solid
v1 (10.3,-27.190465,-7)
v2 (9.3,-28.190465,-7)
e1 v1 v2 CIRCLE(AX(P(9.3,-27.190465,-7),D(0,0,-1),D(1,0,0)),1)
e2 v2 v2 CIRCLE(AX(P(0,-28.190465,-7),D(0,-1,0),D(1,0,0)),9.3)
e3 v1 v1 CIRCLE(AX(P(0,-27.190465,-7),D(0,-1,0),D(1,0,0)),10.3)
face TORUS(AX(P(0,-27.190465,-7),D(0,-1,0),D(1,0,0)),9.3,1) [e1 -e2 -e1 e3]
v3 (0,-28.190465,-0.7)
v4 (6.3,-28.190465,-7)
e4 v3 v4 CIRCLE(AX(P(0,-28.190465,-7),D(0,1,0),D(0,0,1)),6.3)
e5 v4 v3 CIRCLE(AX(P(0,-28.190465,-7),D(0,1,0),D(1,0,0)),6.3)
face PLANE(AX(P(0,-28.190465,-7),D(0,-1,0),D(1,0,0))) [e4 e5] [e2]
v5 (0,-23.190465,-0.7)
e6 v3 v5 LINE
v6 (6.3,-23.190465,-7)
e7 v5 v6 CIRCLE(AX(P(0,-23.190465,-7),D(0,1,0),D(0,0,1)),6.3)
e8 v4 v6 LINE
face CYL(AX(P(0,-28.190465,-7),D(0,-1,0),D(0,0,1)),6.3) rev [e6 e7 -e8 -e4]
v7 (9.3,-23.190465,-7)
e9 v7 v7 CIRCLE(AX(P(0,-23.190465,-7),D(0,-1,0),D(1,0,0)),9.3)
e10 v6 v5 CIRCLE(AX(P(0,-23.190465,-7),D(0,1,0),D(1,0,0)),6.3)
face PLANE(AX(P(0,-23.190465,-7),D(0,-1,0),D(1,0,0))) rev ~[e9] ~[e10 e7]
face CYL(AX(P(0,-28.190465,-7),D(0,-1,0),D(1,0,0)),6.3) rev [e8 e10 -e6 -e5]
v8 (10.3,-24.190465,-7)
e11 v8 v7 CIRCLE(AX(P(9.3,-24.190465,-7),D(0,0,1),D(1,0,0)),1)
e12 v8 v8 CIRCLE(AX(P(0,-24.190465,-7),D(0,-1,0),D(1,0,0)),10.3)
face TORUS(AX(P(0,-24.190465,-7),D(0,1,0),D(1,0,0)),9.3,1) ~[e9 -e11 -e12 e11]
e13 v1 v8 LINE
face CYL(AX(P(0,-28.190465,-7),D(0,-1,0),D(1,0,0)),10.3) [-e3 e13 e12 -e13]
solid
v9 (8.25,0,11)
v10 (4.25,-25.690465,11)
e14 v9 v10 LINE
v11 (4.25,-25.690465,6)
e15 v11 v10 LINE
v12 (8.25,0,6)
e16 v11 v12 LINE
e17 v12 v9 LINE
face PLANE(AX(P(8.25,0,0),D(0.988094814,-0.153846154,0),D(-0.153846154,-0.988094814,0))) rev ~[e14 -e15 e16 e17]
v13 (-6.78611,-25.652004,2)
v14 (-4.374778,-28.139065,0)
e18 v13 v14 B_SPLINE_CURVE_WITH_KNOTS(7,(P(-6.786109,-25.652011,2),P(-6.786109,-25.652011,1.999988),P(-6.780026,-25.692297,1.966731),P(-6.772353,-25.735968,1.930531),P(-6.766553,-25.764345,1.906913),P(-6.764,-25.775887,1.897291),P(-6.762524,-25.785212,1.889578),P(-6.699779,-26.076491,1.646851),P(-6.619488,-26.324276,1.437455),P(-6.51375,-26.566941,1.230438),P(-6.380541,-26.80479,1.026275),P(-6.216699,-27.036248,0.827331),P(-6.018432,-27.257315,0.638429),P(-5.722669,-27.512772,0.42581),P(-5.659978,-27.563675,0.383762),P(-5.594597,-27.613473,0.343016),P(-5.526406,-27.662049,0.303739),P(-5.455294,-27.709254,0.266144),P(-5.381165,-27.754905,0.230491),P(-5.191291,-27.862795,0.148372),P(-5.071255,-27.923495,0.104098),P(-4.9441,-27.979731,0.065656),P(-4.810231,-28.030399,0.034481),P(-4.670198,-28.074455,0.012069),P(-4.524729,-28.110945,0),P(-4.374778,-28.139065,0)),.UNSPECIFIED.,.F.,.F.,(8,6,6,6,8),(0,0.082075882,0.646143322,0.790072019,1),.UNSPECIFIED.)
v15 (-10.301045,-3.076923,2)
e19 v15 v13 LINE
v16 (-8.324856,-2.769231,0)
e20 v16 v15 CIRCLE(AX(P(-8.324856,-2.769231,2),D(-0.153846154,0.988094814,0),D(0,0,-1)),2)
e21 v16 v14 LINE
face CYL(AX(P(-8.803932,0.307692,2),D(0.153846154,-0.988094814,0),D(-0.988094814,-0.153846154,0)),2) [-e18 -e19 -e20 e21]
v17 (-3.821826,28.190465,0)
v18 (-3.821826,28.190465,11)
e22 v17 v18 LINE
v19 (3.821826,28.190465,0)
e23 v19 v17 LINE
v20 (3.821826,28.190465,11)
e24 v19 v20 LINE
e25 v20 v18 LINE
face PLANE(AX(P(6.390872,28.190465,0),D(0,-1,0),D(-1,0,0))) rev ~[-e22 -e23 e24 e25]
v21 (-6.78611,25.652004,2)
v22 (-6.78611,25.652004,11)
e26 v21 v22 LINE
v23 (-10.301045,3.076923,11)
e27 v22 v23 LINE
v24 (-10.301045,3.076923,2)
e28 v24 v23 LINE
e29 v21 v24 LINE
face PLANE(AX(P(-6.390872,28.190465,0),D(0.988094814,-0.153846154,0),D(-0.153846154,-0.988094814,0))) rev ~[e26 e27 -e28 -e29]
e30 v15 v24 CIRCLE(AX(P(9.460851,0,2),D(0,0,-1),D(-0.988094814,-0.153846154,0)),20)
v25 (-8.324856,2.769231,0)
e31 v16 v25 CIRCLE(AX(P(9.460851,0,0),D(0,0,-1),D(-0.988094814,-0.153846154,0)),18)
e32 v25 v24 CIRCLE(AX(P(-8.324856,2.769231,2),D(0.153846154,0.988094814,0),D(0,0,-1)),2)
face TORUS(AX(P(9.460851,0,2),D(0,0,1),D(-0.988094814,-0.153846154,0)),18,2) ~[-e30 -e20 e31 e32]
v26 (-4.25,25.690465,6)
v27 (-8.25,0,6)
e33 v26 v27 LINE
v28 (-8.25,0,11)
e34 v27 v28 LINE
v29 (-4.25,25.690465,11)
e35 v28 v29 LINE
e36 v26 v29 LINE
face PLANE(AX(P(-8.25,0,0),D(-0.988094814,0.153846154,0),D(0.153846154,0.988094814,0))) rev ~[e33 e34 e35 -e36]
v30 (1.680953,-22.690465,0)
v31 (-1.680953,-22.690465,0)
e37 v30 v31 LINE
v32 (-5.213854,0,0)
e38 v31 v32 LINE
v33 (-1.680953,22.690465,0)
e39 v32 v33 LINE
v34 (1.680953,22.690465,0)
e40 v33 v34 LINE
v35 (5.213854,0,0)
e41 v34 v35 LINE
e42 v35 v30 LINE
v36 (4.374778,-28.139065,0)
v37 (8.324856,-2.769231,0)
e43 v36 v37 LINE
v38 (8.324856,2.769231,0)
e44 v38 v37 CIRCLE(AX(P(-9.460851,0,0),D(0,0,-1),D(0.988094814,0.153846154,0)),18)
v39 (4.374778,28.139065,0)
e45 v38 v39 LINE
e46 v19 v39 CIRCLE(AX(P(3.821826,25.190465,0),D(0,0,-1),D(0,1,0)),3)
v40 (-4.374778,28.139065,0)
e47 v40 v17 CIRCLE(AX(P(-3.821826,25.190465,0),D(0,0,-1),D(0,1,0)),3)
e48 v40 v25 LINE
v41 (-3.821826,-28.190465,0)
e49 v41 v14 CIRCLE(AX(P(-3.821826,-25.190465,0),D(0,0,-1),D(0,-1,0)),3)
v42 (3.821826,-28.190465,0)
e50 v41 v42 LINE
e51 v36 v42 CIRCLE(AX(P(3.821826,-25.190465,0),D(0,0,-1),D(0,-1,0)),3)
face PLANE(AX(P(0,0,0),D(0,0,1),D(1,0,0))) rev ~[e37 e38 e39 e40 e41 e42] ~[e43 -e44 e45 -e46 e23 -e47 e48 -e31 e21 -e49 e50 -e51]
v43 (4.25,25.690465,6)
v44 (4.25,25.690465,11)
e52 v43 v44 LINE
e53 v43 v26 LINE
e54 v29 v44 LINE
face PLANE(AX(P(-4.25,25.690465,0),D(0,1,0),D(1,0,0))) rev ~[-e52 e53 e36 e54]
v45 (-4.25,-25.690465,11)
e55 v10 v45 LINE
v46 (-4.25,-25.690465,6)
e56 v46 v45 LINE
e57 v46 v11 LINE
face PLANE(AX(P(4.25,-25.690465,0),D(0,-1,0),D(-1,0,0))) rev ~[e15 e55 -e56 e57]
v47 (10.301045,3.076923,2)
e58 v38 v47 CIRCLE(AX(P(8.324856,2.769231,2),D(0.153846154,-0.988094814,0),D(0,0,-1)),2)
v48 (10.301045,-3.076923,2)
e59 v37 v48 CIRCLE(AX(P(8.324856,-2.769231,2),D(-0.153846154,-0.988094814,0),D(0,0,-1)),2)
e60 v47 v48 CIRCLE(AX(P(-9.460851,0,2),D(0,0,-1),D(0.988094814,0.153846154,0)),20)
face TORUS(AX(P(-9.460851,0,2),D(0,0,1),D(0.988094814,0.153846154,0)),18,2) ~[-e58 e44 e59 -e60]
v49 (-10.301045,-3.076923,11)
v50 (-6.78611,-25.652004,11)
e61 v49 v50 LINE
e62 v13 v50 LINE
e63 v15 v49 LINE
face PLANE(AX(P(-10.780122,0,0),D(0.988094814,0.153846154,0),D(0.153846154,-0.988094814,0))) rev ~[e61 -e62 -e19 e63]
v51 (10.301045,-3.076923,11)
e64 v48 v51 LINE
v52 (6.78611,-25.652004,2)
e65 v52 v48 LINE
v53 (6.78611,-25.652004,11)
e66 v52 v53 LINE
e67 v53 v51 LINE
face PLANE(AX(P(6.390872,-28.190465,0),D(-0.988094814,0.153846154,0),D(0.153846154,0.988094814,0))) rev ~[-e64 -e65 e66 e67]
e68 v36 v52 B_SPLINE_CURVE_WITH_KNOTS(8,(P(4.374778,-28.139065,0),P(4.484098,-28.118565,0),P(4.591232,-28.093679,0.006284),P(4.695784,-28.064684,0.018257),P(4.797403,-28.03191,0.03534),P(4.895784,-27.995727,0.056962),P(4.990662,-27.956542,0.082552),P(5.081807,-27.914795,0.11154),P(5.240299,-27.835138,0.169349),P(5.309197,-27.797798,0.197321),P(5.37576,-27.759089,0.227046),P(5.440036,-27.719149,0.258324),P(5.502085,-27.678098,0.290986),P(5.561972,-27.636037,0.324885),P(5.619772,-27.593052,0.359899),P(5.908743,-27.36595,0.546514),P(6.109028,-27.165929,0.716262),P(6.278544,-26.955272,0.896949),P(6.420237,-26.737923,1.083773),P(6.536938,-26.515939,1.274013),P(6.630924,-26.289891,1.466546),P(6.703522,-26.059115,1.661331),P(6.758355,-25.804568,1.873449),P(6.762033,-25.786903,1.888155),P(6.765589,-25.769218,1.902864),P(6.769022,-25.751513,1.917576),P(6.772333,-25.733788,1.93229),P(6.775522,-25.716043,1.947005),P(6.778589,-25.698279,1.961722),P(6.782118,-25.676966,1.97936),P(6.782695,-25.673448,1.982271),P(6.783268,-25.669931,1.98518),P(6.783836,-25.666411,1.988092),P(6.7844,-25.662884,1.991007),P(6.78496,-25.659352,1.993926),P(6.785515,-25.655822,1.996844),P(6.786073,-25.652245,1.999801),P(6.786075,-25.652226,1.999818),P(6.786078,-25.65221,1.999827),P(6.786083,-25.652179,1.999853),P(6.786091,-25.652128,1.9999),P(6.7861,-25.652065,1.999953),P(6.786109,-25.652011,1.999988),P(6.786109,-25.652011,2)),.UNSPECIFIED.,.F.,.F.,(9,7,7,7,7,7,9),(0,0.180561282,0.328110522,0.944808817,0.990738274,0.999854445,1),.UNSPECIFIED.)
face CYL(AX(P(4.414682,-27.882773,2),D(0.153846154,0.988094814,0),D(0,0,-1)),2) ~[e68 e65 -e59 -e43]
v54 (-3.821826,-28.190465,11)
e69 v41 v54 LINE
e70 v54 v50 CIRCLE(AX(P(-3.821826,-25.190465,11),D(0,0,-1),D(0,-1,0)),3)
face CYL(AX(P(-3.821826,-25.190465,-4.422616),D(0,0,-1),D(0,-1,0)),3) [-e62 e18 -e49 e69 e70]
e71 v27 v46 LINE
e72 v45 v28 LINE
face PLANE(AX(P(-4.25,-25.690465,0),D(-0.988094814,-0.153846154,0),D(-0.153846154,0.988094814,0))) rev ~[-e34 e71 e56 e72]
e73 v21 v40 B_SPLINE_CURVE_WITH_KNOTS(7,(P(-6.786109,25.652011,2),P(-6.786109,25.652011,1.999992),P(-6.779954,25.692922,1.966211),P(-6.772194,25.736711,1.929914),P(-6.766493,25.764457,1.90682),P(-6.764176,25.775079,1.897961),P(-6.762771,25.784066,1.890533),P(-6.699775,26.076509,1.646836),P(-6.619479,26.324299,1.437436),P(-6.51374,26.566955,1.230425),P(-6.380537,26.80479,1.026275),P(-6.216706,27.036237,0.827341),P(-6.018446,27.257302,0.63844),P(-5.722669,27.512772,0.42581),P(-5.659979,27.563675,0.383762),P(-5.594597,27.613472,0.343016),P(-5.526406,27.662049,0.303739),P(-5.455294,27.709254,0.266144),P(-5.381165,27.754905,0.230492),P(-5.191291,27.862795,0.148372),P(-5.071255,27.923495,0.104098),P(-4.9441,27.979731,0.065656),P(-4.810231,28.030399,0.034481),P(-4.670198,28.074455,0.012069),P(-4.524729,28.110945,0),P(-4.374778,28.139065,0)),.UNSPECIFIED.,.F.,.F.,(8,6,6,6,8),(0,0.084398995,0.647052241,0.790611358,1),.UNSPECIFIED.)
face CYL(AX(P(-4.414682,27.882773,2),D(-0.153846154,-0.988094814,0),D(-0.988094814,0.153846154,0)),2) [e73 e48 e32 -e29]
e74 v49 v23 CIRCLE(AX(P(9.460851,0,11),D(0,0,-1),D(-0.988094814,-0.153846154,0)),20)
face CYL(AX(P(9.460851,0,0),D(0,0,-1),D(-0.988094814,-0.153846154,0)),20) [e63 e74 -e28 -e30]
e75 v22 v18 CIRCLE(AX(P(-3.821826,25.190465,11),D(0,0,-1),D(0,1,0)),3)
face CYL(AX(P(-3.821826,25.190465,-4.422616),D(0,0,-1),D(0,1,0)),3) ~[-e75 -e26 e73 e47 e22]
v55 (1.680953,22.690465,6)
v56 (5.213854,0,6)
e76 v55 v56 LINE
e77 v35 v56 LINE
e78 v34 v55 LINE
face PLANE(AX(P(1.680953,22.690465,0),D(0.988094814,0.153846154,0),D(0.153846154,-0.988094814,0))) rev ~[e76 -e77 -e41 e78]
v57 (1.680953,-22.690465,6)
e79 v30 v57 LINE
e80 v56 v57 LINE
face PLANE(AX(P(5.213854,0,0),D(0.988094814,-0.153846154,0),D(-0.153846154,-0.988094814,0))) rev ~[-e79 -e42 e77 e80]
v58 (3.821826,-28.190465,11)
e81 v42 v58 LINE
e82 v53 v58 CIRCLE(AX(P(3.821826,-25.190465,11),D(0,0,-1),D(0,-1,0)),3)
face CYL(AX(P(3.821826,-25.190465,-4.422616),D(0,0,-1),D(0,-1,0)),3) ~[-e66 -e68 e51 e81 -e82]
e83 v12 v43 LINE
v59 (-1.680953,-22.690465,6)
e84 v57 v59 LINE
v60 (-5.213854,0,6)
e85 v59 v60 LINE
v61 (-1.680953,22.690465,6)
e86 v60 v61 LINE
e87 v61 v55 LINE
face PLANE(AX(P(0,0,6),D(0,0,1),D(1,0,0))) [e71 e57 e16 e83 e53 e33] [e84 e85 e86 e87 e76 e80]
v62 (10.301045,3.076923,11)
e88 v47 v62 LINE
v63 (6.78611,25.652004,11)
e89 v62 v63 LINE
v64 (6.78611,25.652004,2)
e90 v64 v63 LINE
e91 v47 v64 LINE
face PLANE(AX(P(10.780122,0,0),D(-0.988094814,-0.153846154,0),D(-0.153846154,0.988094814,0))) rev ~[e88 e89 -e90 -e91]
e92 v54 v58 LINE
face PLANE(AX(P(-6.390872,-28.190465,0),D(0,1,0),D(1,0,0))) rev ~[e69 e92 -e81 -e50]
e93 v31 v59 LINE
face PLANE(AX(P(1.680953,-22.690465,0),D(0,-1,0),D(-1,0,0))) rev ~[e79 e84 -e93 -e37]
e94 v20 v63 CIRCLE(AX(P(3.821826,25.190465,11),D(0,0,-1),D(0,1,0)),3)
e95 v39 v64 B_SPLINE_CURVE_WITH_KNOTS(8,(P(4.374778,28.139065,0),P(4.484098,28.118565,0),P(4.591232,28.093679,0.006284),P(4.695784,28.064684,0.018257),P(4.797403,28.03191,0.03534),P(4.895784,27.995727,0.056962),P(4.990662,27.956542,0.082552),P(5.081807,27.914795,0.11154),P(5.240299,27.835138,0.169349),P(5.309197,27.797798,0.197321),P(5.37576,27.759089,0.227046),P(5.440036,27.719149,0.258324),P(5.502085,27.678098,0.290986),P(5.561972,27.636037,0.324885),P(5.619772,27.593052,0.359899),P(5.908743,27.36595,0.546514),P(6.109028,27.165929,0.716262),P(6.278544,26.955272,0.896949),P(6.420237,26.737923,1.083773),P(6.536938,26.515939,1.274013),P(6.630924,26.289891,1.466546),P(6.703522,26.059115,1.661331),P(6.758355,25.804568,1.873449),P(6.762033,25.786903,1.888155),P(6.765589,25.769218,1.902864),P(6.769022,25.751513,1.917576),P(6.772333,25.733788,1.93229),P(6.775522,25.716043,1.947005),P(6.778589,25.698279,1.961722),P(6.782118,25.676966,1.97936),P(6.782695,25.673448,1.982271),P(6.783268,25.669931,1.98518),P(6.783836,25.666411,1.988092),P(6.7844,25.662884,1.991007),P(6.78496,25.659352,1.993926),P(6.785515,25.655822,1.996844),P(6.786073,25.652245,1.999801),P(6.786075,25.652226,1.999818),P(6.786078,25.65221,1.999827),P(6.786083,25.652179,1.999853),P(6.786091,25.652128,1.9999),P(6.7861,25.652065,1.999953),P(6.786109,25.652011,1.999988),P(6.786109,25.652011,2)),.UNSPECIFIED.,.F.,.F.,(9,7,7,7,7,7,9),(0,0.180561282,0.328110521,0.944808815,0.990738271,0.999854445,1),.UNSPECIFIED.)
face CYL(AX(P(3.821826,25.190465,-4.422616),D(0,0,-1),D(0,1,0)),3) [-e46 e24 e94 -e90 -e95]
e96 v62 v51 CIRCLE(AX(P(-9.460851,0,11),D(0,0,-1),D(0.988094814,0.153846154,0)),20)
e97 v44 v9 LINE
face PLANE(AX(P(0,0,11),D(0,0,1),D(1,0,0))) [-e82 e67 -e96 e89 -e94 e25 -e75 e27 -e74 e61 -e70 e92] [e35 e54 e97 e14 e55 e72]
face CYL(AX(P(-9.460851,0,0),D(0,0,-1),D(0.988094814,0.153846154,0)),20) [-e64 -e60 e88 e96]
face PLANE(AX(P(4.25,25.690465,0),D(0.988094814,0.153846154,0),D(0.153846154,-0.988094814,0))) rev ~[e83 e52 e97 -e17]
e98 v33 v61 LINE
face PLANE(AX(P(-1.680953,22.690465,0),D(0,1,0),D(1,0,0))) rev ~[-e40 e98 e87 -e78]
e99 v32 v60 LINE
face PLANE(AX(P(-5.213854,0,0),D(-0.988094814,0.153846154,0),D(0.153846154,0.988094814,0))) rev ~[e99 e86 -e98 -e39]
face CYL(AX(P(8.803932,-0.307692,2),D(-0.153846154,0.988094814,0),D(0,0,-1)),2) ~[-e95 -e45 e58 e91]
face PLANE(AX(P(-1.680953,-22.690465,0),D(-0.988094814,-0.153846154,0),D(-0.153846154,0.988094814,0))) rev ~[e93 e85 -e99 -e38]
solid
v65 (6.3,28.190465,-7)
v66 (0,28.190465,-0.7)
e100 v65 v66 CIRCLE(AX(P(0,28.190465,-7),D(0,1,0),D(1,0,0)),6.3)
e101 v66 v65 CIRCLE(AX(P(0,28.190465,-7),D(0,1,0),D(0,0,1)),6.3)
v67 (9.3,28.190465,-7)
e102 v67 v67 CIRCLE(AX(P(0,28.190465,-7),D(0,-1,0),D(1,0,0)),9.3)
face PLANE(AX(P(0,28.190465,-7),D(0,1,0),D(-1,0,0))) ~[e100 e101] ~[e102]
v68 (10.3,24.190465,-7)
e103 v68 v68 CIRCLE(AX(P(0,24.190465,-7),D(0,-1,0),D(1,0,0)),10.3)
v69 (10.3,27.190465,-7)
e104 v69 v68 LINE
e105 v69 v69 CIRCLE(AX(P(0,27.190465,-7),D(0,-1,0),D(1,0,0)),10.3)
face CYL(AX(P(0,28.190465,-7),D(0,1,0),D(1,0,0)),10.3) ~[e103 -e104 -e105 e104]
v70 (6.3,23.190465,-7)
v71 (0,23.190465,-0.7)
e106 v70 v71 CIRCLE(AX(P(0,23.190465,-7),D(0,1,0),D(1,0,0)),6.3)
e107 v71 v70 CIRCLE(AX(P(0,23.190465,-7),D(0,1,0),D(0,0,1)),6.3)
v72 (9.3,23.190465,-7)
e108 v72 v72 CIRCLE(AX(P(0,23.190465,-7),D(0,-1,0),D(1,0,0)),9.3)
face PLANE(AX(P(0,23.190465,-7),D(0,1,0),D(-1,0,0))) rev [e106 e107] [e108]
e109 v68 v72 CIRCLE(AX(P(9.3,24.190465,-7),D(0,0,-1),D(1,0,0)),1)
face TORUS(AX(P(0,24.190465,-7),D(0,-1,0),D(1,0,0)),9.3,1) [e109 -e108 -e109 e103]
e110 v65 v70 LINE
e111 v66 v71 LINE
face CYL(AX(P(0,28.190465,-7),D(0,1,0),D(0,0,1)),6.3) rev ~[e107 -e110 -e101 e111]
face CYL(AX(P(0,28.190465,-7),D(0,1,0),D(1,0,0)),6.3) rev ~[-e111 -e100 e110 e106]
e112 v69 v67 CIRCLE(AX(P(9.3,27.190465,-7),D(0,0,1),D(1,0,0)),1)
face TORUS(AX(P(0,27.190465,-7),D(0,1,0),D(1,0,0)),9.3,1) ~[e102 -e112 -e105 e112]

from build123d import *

# Parameters (mm, degrees)
F1_DEPTH     = 6
F2_DEPTH     = 11
F3_R         = 10.3
F4_DEPTH     = 5
F8_R         = 2
F9_R         = 1
F9_2_R       = 1
F10_T1_DEPTH = 21.8452325787
F11_T1_DEPTH = 18.7849894416
F11_T4_ANGLE = 17.6997661969
F11_T6_ANGLE = 17.6997661969


# Not quite as in the source:
# - a fillet or chamfer that OpenCascade refuses, or shapes differently, is made with other operations: its cross-section is extruded or revolved along the edge and cut away or added


with BuildPart() as f1:
    # F0 (on Top) → F1 (new body)
    with BuildSketch(Plane.XY):
        Polygon((4.25, -25.6904651573), (8.25, 0), (4.25, 25.6904651573), (0, 25.6904651573), (-4.25, 25.6904651573), (-8.25, 0), (-4.25, -25.6904651573), (0, -25.6904651573), align=None)
        Polygon((0, 22.6904651573), (1.6809534843, 22.6904651573), (5.2138541178, 0), (1.6809534843, -22.6904651573), (0, -22.6904651573), (-1.6809534843, -22.6904651573), (-5.2138541178, 0), (-1.6809534843, 22.6904651573), align=None, mode=Mode.SUBTRACT)
    extrude(amount=F1_DEPTH)

    # F0 (on Top) → F2 (join)
    with BuildSketch(Plane.XY):
        Polygon((-6.3908720964, 28.1904651573), (-10.7801215685, 0), (-6.3908720964, -28.1904651573), (0, -28.1904651573), (6.3908720964, -28.1904651573), (10.7801215685, 0), (6.3908720964, 28.1904651573), (0, 28.1904651573), align=None)
        Polygon((4.25, 25.6904651573), (8.25, 0), (4.25, -25.6904651573), (0, -25.6904651573), (-4.25, -25.6904651573), (-8.25, 0), (-4.25, 25.6904651573), (0, 25.6904651573), align=None, mode=Mode.SUBTRACT)
    extrude(amount=F2_DEPTH)

    # F8
    f8_edges = [f1.edges().sort_by_distance(p)[0] for p in [
        (-8.585497, -14.095233, 0),
        (-8.585497, 14.095233, 0),
        (8.585497, 14.095233, 0),
        (8.585497, -14.095233, 0),
    ]]
    fillet(f8_edges, radius=F8_R)

    # F10: fillet of radius 3 on 4 edges, made by hand

    # F10_s2 → F10_t1 (cut)
    with BuildSketch(Plane.XY.offset(-4.4226162893)):
        with BuildLine():
            ThreePointArc((-3.8218255807, -28.1904651573), (-5.7731564875, -27.4691287333), (-6.7861100219, -25.6520036189))
            Line((-6.7861100219, -25.6520036189), (-6.3908720964, -28.1904651573))
            Line((-6.3908720964, -28.1904651573), (-3.8218255807, -28.1904651573))
        make_face()
        with BuildLine():
            ThreePointArc((3.8218255807, -28.1904651573), (5.7731564875, -27.4691287333), (6.7861100219, -25.6520036189))
            Line((6.7861100219, -25.6520036189), (6.3908720964, -28.1904651573))
            Line((6.3908720964, -28.1904651573), (3.8218255807, -28.1904651573))
        make_face()
        with BuildLine():
            ThreePointArc((-3.8218255807, 28.1904651573), (-5.7731564875, 27.4691287333), (-6.7861100219, 25.6520036189))
            Line((-6.7861100219, 25.6520036189), (-6.3908720964, 28.1904651573))
            Line((-6.3908720964, 28.1904651573), (-3.8218255807, 28.1904651573))
        make_face()
        with BuildLine():
            ThreePointArc((3.8218255807, 28.1904651573), (5.7731564875, 27.4691287333), (6.7861100219, 25.6520036189))
            Line((6.7861100219, 25.6520036189), (6.3908720964, 28.1904651573))
            Line((6.3908720964, 28.1904651573), (3.8218255807, 28.1904651573))
        make_face()
    extrude(amount=F10_T1_DEPTH, mode=Mode.SUBTRACT)

    # F11: fillet of radius 20 on 2 edges, made by hand

    # F11_s2 → F11_t1 (cut)
    with BuildSketch(Plane.XY):
        with BuildLine():
            ThreePointArc((-10.3010452952, -3.0769230769), (-10.5391490203, 0), (-10.3010452952, 3.0769230769))
            Line((-10.3010452952, 3.0769230769), (-10.7801215685, 0))
            Line((-10.7801215685, 0), (-10.3010452952, -3.0769230769))
        make_face()
        with BuildLine():
            ThreePointArc((10.3010452952, 3.0769230769), (10.5391490203, 0), (10.3010452952, -3.0769230769))
            Line((10.3010452952, -3.0769230769), (10.7801215685, 0))
            Line((10.7801215685, 0), (10.3010452952, 3.0769230769))
        make_face()
    extrude(amount=F11_T1_DEPTH, mode=Mode.SUBTRACT)

    # F11_s3 → F11_t4 (revolve, cut)
    with BuildSketch(Plane(origin=(-0.223925467, 1.4381873518, 0), x_dir=(0, 0, 1), z_dir=(-0.1538461538, 0.9880948137, 0))):
        with BuildLine():
            ThreePointArc((0, 8.6517822134), (0.5857864376, 10.0659957758), (2, 10.6517822134))
            Line((2, 10.6517822134), (0, 10.6517822134))
            Line((0, 10.6517822134), (0, 8.6517822134))
        make_face()
    revolve(axis=Axis((-9.4608509797, 0, 0), (0, 0, -1)), revolution_arc=F11_T4_ANGLE, mode=Mode.SUBTRACT)

    # F11_s5 → F11_t6 (revolve, cut)
    with BuildSketch(Plane(origin=(0.223925467, -1.4381873518, 0), x_dir=(0, 0, 1), z_dir=(0.1538461538, -0.9880948137, 0))):
        with BuildLine():
            ThreePointArc((0, 8.6517822134), (0.5857864376, 10.0659957758), (2, 10.6517822134))
            Line((2, 10.6517822134), (0, 10.6517822134))
            Line((0, 10.6517822134), (0, 8.6517822134))
        make_face()
    revolve(axis=Axis((9.4608509797, 0, 0), (0, 0, -1)), revolution_arc=F11_T6_ANGLE, mode=Mode.SUBTRACT)


with BuildPart() as f4:
    # F3 (on face) → F4 (new body)
    with BuildSketch(Plane.XZ.offset(28.1904651573)):
        with Locations((0, -7)):
            Circle(F3_R)
        with BuildLine():
            ThreePointArc((0, -0.7), (4.4547727215, -2.5452272785), (6.3, -7))
            ThreePointArc((6.3, -7), (-4.4547727215, -11.4547727215), (0, -0.7))
        make_face(mode=Mode.SUBTRACT)
    extrude(amount=-F4_DEPTH)


with BuildPart() as f7_1:
    # F7: instance of F4
    add(f4.part.mirror(Plane(origin=(0, 0, -12.5), x_dir=(-1, 0, 0), z_dir=(0, -1, 0))))

    # F9#2
    f9_2_edges = [f7_1.edges().sort_by_distance(p)[0] for p in [
        (-10.3, 28.190465, -7),
        (-10.3, 23.190465, -7),
    ]]
    fillet(f9_2_edges, radius=F9_2_R)


with BuildPart() as f4_1:
    add(f4.part)

    # F9
    f9_edges = [f4_1.edges().sort_by_distance(p)[0] for p in [
        (-10.3, -28.190465, -7),
        (-10.3, -23.190465, -7),
    ]]
    fillet(f9_edges, radius=F9_R)


solid = Compound([f1.part, f7_1.part, f4_1.part])
